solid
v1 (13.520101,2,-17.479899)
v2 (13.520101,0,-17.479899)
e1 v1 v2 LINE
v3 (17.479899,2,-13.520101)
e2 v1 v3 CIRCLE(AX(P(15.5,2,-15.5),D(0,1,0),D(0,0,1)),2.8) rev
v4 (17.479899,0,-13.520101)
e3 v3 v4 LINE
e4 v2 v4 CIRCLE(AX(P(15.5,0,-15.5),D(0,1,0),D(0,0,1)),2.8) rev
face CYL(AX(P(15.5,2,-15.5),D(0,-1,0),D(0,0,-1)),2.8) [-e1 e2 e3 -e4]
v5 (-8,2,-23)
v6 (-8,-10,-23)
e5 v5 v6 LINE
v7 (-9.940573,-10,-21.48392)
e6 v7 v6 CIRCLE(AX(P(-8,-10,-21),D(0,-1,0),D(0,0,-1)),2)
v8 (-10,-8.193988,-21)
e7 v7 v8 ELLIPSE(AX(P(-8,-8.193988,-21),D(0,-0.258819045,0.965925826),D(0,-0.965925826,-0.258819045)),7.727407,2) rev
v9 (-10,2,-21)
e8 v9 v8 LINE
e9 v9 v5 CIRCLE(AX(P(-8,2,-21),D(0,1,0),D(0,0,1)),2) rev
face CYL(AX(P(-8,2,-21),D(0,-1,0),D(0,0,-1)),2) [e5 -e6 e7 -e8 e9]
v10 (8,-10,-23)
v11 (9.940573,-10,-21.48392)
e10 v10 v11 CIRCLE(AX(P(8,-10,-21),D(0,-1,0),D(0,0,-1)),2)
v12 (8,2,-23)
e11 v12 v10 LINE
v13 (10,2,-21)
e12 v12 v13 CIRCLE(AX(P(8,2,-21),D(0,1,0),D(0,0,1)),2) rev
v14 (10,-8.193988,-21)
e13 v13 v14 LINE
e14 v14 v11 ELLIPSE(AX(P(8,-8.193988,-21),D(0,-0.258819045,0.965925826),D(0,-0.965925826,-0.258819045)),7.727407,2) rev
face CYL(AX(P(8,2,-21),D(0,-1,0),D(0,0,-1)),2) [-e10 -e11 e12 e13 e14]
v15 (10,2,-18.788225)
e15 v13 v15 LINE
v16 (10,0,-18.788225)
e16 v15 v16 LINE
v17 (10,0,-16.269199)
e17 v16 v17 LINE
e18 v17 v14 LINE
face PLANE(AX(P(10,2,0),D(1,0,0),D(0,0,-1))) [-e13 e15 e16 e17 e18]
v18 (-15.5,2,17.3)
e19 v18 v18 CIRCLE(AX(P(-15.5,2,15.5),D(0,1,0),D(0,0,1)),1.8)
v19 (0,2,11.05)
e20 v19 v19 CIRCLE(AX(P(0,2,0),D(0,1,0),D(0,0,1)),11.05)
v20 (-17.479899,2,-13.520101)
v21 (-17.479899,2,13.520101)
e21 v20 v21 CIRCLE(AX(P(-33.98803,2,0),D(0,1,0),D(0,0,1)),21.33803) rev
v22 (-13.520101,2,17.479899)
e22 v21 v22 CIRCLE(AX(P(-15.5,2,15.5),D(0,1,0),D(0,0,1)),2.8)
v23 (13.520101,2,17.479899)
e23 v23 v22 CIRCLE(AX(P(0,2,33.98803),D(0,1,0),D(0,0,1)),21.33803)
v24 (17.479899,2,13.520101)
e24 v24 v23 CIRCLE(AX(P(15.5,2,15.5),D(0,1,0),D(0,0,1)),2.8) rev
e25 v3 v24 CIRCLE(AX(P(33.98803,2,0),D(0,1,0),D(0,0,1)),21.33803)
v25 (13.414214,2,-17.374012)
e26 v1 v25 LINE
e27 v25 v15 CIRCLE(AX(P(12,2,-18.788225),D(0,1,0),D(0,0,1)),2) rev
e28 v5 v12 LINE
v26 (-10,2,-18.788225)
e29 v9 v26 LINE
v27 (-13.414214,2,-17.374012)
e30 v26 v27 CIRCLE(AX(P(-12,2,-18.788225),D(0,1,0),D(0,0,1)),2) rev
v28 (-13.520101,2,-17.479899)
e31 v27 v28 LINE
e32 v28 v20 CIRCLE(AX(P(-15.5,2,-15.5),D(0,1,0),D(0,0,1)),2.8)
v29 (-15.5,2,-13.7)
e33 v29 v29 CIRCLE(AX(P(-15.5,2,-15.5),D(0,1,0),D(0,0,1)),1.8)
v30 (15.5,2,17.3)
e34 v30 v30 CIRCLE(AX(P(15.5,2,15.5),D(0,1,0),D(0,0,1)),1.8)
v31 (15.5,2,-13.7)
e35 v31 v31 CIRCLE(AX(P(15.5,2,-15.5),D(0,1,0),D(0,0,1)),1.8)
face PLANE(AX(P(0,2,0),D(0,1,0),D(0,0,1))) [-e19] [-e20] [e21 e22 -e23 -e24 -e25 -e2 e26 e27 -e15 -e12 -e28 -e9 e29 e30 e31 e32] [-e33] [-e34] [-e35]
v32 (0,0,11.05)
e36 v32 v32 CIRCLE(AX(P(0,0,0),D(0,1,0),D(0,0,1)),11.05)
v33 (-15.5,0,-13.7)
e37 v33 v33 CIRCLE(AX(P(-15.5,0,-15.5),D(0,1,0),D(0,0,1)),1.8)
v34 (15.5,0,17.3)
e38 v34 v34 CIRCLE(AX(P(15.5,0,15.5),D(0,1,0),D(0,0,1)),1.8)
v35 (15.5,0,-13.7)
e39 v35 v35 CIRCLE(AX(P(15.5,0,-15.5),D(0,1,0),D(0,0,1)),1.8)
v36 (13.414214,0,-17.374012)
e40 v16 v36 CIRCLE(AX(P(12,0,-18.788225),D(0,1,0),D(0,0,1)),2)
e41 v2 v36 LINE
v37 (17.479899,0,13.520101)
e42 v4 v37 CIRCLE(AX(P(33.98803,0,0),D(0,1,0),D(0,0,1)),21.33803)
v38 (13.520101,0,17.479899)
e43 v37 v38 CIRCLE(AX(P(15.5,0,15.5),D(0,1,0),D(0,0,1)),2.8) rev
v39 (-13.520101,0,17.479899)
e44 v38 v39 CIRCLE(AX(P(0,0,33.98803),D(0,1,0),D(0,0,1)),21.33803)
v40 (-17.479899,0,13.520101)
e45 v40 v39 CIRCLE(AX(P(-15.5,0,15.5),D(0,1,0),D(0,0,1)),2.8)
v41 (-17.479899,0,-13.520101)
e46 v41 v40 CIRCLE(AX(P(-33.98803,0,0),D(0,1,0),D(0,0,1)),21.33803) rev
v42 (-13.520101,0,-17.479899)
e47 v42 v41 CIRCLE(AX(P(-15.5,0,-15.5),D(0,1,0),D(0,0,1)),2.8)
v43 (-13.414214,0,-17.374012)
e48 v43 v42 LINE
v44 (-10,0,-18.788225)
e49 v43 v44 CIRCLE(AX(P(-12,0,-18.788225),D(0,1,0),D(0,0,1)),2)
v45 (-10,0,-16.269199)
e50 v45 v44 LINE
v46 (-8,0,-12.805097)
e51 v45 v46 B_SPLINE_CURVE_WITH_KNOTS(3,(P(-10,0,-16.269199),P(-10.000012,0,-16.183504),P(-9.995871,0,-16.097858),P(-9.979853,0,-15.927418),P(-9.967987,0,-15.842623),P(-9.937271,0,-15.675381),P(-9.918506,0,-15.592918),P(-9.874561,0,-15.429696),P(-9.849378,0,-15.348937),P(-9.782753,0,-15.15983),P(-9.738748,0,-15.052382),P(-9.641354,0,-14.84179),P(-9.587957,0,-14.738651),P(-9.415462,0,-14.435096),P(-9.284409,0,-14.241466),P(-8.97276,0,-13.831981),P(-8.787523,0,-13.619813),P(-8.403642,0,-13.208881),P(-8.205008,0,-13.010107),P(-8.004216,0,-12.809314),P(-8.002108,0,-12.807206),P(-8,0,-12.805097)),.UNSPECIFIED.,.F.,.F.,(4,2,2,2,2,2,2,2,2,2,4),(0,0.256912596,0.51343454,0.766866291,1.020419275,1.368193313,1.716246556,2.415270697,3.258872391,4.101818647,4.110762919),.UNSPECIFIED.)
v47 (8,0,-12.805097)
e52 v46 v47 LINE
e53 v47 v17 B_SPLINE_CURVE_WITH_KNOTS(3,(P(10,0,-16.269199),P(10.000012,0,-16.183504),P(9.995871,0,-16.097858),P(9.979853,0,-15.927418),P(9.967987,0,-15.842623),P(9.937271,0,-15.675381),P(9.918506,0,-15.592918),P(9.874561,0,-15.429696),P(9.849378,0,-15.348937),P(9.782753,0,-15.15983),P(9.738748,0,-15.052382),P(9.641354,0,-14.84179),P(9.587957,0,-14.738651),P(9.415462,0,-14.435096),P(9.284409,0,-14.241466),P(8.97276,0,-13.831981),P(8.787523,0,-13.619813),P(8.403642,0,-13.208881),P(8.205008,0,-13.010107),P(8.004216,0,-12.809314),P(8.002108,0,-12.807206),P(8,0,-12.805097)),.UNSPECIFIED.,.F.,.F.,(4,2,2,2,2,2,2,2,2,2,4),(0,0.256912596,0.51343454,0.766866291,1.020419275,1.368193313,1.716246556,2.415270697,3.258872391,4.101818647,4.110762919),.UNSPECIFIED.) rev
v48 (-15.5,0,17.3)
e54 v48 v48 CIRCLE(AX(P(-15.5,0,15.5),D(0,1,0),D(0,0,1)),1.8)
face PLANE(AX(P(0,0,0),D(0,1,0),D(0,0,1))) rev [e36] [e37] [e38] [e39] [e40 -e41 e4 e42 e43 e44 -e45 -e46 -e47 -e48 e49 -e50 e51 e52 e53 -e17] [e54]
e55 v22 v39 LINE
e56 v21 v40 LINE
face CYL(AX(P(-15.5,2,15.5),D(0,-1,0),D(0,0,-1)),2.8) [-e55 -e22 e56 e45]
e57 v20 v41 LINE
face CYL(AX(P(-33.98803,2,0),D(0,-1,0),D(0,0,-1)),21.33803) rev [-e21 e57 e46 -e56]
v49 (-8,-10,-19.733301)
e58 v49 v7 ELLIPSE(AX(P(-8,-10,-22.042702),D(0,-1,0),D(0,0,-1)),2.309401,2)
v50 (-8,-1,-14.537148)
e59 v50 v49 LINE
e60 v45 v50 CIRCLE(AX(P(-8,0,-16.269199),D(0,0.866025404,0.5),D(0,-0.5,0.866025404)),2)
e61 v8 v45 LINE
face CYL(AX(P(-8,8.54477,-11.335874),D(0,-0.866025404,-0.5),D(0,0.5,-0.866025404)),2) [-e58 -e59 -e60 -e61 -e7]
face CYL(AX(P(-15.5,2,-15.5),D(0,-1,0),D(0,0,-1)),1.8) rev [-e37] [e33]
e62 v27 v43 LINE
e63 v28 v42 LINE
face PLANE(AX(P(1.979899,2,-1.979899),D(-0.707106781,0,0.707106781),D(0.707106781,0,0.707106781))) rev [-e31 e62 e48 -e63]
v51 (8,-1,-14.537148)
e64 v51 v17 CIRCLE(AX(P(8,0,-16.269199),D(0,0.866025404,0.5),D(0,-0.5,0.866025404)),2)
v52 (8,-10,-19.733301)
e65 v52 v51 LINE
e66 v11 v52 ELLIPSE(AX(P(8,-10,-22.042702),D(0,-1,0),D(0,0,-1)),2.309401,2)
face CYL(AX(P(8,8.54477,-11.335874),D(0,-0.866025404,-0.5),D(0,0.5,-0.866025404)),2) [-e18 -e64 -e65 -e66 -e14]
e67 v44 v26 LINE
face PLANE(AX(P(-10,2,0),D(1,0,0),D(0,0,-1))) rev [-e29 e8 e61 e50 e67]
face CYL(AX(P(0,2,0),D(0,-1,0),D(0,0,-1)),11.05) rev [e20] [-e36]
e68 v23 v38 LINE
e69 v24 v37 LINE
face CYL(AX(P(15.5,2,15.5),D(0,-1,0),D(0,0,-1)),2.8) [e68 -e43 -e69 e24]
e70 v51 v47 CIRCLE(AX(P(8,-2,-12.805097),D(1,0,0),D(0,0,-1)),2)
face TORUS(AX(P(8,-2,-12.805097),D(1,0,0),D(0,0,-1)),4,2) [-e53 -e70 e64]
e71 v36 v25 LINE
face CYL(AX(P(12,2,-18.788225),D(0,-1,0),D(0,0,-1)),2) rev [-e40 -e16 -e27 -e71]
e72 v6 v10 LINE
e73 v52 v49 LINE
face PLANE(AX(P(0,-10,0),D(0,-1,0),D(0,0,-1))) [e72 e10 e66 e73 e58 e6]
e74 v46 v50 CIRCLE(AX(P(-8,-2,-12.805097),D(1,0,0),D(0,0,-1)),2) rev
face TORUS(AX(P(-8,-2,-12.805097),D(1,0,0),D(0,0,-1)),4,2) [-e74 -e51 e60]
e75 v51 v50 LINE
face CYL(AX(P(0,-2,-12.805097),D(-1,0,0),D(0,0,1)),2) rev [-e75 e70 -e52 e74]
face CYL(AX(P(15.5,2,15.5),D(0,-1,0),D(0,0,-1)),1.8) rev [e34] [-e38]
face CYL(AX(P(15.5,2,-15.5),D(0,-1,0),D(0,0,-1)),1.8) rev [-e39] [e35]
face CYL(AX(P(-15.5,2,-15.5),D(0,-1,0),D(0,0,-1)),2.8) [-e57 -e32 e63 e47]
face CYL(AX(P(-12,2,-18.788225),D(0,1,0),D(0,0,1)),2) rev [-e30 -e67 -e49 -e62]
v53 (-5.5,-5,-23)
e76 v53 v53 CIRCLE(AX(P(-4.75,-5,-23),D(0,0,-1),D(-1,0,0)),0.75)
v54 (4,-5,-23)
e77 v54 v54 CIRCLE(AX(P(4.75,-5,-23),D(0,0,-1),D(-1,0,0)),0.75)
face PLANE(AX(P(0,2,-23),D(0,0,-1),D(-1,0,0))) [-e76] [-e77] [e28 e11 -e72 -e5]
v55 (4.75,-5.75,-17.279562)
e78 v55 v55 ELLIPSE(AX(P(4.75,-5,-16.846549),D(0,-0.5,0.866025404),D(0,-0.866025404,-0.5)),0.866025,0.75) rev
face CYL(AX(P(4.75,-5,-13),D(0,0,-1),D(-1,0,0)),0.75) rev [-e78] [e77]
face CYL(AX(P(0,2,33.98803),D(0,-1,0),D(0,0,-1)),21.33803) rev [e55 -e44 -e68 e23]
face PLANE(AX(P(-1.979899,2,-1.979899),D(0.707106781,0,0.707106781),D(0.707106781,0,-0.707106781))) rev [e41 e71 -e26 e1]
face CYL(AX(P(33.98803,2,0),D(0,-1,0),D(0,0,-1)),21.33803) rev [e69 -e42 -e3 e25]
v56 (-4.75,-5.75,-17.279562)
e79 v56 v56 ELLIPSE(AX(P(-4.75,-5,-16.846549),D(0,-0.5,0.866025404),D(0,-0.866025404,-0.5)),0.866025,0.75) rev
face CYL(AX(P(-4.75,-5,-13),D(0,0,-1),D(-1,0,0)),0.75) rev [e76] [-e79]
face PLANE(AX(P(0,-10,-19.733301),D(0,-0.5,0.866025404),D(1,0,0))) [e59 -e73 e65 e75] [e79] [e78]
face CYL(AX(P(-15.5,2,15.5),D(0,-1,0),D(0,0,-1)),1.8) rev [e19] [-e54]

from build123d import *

# Parameters (mm, degrees)
SKETCH_1_R          = 1.8
EXTRUDE_1_DEPTH     = 2
EXTRUDE_START       = 10
EXTRUDE_2_DEPTH     = 10
SKETCH_3_R          = 0.75
CUT_EXTRUDE_1_DEPTH = 10
FILLET_3_R          = 2
CHAMFER_1_SIZE      = 5.773502692
CHAMFER_1_SIZE_2    = 10
FILLET_1_R          = 2
FILLET_2_R          = 2


with BuildPart() as part:
    # 草图1 → 凸台-拉伸1 (new body)
    # profile 1 of 19: a face of its own
    with BuildSketch(Plane(origin=(0, 0, 0), x_dir=(1, 0, 0), z_dir=(0, 1, 0))):
        with BuildLine():
            ThreePointArc((17.479898987, 13.520101013), (17.479898987, 17.479898987), (13.520101013, 17.479898987))
            Line((13.520101013, 17.479898987), (10, 13.959797975))
            Line((10, 13.959797975), (6.743130876, 10.702928851))
            ThreePointArc((6.743130876, 10.702928851), (8.944900782, 8.944900782), (10.702928851, 6.743130876))
            Line((10.702928851, 6.743130876), (17.479898987, 13.520101013))
        make_face()
        with Locations(Location((15.5, 15.5, 0), (0, 0, 270))):
            Circle(SKETCH_1_R, mode=Mode.SUBTRACT)
    # profile 2 of 19: a face of its own
    with BuildSketch(Plane(origin=(0, 0, 0), x_dir=(1, 0, 0), z_dir=(0, 1, 0))):
        with BuildLine():
            ThreePointArc((10.702928851, 6.743130876), (8.944900782, 8.944900782), (6.743130876, 10.702928851))
            Line((6.743130876, 10.702928851), (5.578622694, 9.538420668))
            ThreePointArc((5.578622694, 9.538420668), (7.813529932, 7.813529932), (9.538420668, 5.578622694))
            Line((9.538420668, 5.578622694), (10.702928851, 6.743130876))
        make_face()
    # profile 3 of 19: a face of its own
    with BuildSketch(Plane(origin=(0, 0, 0), x_dir=(1, 0, 0), z_dir=(0, 1, 0))):
        with BuildLine():
            Line((5.578622694, 9.538420668), (6.743130876, 10.702928851))
            ThreePointArc((6.743130876, 10.702928851), (0, 12.65), (-6.743130876, 10.702928851))
            Line((-6.743130876, 10.702928851), (-5.578622694, 9.538420668))
            ThreePointArc((-5.578622694, 9.538420668), (0, 11.05), (5.578622694, 9.538420668))
        make_face()
    # profile 4 of 19: a face of its own
    with BuildSketch(Plane(origin=(0, 0, 0), x_dir=(1, 0, 0), z_dir=(0, 1, 0))):
        with BuildLine():
            ThreePointArc((12.65, 0), (12.153488182, 3.509305489), (10.702928851, 6.743130876))
            Line((10.702928851, 6.743130876), (9.538420668, 5.578622694))
            ThreePointArc((9.538420668, 5.578622694), (10.665412519, 2.889892006), (11.05, 0))
            ThreePointArc((11.05, 0), (10.665412519, -2.889892006), (9.538420668, -5.578622694))
            Line((9.538420668, -5.578622694), (10.702928851, -6.743130876))
            ThreePointArc((10.702928851, -6.743130876), (12.153488182, -3.509305489), (12.65, 0))
        make_face()
    # profile 5 of 19: a face of its own
    with BuildSketch(Plane(origin=(0, 0, 0), x_dir=(1, 0, 0), z_dir=(0, 1, 0))):
        with BuildLine():
            ThreePointArc((6.743130876, -10.702928851), (8.944900782, -8.944900782), (10.702928851, -6.743130876))
            Line((10.702928851, -6.743130876), (9.538420668, -5.578622694))
            ThreePointArc((9.538420668, -5.578622694), (7.813529932, -7.813529932), (5.578622694, -9.538420668))
            Line((5.578622694, -9.538420668), (6.743130876, -10.702928851))
        make_face()
    # profile 6 of 19: a face of its own
    with BuildSketch(Plane(origin=(0, 0, 0), x_dir=(1, 0, 0), z_dir=(0, 1, 0))):
        with BuildLine():
            ThreePointArc((0, -12.65), (3.50930549, -12.153488182), (6.743130876, -10.702928851))
            Line((6.743130876, -10.702928851), (5.578622694, -9.538420668))
            ThreePointArc((5.578622694, -9.538420668), (0, -11.05), (-5.578622694, -9.538420668))
            Line((-5.578622694, -9.538420668), (-6.743130876, -10.702928851))
            ThreePointArc((-6.743130876, -10.702928851), (-3.509305489, -12.153488182), (0, -12.65))
        make_face()
    # profile 7 of 19: a face of its own
    with BuildSketch(Plane(origin=(0, 0, 0), x_dir=(1, 0, 0), z_dir=(0, 1, 0))):
        with BuildLine():
            Line((17.479898987, -13.520101013), (10.702928851, -6.743130876))
            ThreePointArc((10.702928851, -6.743130876), (8.944900782, -8.944900782), (6.743130876, -10.702928851))
            Line((6.743130876, -10.702928851), (13.520101013, -17.479898987))
            ThreePointArc((13.520101013, -17.479898987), (17.479898987, -17.479898987), (17.479898987, -13.520101013))
        make_face()
        with Locations(Location((15.5, -15.5, 0), (0, 0, 270))):
            Circle(SKETCH_1_R, mode=Mode.SUBTRACT)
    # profile 8 of 19: a face of its own
    with BuildSketch(Plane(origin=(0, 0, 0), x_dir=(1, 0, 0), z_dir=(0, 1, 0))):
        with BuildLine():
            ThreePointArc((-6.743130876, -10.702928851), (-8.944900782, -8.944900782), (-10.702928851, -6.743130876))
            Line((-10.702928851, -6.743130876), (-17.479898987, -13.520101013))
            ThreePointArc((-17.479898987, -13.520101013), (-17.479898987, -17.479898987), (-13.520101013, -17.479898987))
            Line((-13.520101013, -17.479898987), (-6.743130876, -10.702928851))
        make_face()
        with Locations(Location((-15.5, -15.5, 0), (0, 0, 270))):
            Circle(SKETCH_1_R, mode=Mode.SUBTRACT)
    # profile 9 of 19: a face of its own
    with BuildSketch(Plane(origin=(0, 0, 0), x_dir=(1, 0, 0), z_dir=(0, 1, 0))):
        with BuildLine():
            Line((13.520101013, -17.479898987), (6.743130876, -10.702928851))
            ThreePointArc((6.743130876, -10.702928851), (3.50930549, -12.153488182), (0, -12.65))
            ThreePointArc((0, -12.65), (7.178458324, -13.893720868), (13.520101013, -17.479898987))
        make_face()
    # profile 10 of 19: a face of its own
    with BuildSketch(Plane(origin=(0, 0, 0), x_dir=(1, 0, 0), z_dir=(0, 1, 0))):
        with BuildLine():
            ThreePointArc((-13.520101013, -17.479898987), (-7.178458324, -13.893720867), (0, -12.65))
            ThreePointArc((0, -12.65), (-3.509305489, -12.153488182), (-6.743130876, -10.702928851))
            Line((-6.743130876, -10.702928851), (-13.520101013, -17.479898987))
        make_face()
    # profile 11 of 19: a face of its own
    with BuildSketch(Plane(origin=(0, 0, 0), x_dir=(1, 0, 0), z_dir=(0, 1, 0))):
        with BuildLine():
            ThreePointArc((17.479898987, -13.520101013), (13.893720868, -7.178458324), (12.65, 0))
            ThreePointArc((12.65, 0), (12.153488182, -3.509305489), (10.702928851, -6.743130876))
            Line((10.702928851, -6.743130876), (17.479898987, -13.520101013))
        make_face()
    # profile 12 of 19: a face of its own
    with BuildSketch(Plane(origin=(0, 0, 0), x_dir=(1, 0, 0), z_dir=(0, 1, 0))):
        with BuildLine():
            ThreePointArc((12.65, 0), (13.893720868, 7.178458324), (17.479898987, 13.520101013))
            Line((17.479898987, 13.520101013), (10.702928851, 6.743130876))
            ThreePointArc((10.702928851, 6.743130876), (12.153488182, 3.509305489), (12.65, 0))
        make_face()
    # profile 13 of 19: a face of its own
    with BuildSketch(Plane(origin=(0, 0, 0), x_dir=(1, 0, 0), z_dir=(0, 1, 0))):
        with BuildLine():
            ThreePointArc((-12.65, 2.4e-08), (-12.153488178, 3.509305501), (-10.702928851, 6.743130876))
            Line((-10.702928851, 6.743130876), (-17.479898987, 13.520101013))
            ThreePointArc((-17.479898987, 13.520101013), (-13.893720872, 7.178458335), (-12.65, 2.4e-08))
        make_face()
    # profile 14 of 19: a face of its own
    with BuildSketch(Plane(origin=(0, 0, 0), x_dir=(1, 0, 0), z_dir=(0, 1, 0))):
        with BuildLine():
            ThreePointArc((-10.702928851, -6.743130876), (-12.153488185, -3.509305478), (-12.65, 2.4e-08))
            ThreePointArc((-12.65, 2.4e-08), (-13.893720864, -7.178458313), (-17.479898987, -13.520101013))
            Line((-17.479898987, -13.520101013), (-10.702928851, -6.743130876))
        make_face()
    # profile 15 of 19: a face of its own
    with BuildSketch(Plane(origin=(0, 0, 0), x_dir=(1, 0, 0), z_dir=(0, 1, 0))):
        with BuildLine():
            ThreePointArc((-10.702928851, 6.743130876), (-8.944900782, 8.944900782), (-6.743130876, 10.702928851))
            Line((-6.743130876, 10.702928851), (-10, 13.959797975))
            Line((-10, 13.959797975), (-13.520101013, 17.479898987))
            ThreePointArc((-13.520101013, 17.479898987), (-17.479898987, 17.479898987), (-17.479898987, 13.520101013))
            Line((-17.479898987, 13.520101013), (-10.702928851, 6.743130876))
        make_face()
        with Locations(Location((-15.5, 15.5, 0), (0, 0, 270))):
            Circle(SKETCH_1_R, mode=Mode.SUBTRACT)
    # profile 16 of 19: a face of its own
    with BuildSketch(Plane(origin=(0, 0, 0), x_dir=(1, 0, 0), z_dir=(0, 1, 0))):
        with BuildLine():
            Line((-5.578622694, 9.538420668), (-6.743130876, 10.702928851))
            ThreePointArc((-6.743130876, 10.702928851), (-8.944900782, 8.944900782), (-10.702928851, 6.743130876))
            Line((-10.702928851, 6.743130876), (-9.538420668, 5.578622694))
            ThreePointArc((-9.538420668, 5.578622694), (-7.813529932, 7.813529932), (-5.578622694, 9.538420668))
        make_face()
    # profile 17 of 19: a face of its own
    with BuildSketch(Plane(origin=(0, 0, 0), x_dir=(1, 0, 0), z_dir=(0, 1, 0))):
        with BuildLine():
            Line((-9.538420668, 5.578622694), (-10.702928851, 6.743130876))
            ThreePointArc((-10.702928851, 6.743130876), (-12.153488178, 3.509305501), (-12.65, 2.4e-08))
            ThreePointArc((-12.65, 2.4e-08), (-12.153488185, -3.509305478), (-10.702928851, -6.743130876))
            Line((-10.702928851, -6.743130876), (-9.538420668, -5.578622694))
            ThreePointArc((-9.538420668, -5.578622694), (-11.05, 0), (-9.538420668, 5.578622694))
        make_face()
    # profile 18 of 19: a face of its own
    with BuildSketch(Plane(origin=(0, 0, 0), x_dir=(1, 0, 0), z_dir=(0, 1, 0))):
        with BuildLine():
            ThreePointArc((-5.578622694, -9.538420668), (-7.813529932, -7.813529932), (-9.538420668, -5.578622694))
            Line((-9.538420668, -5.578622694), (-10.702928851, -6.743130876))
            ThreePointArc((-10.702928851, -6.743130876), (-8.944900782, -8.944900782), (-6.743130876, -10.702928851))
            Line((-6.743130876, -10.702928851), (-5.578622694, -9.538420668))
        make_face()
    # profile 19 of 19: a face of its own
    with BuildSketch(Plane(origin=(0, 0, 0), x_dir=(1, 0, 0), z_dir=(0, 1, 0))):
        with BuildLine():
            Line((6.743130876, 10.702928851), (10, 13.959797975))
            Line((10, 13.959797975), (10, 21))
            ThreePointArc((10, 21), (9.414213562, 22.414213562), (8, 23))
            Line((8, 23), (-8, 23))
            ThreePointArc((-8, 23), (-9.414213562, 22.414213562), (-10, 21))
            Line((-10, 21), (-10, 13.959797975))
            Line((-10, 13.959797975), (-6.743130876, 10.702928851))
            ThreePointArc((-6.743130876, 10.702928851), (0, 12.65), (6.743130876, 10.702928851))
        make_face()
    extrude(amount=EXTRUDE_1_DEPTH)

    # 草图2 → 凸台-拉伸2 (add)
    with BuildSketch(Plane.XZ.offset(EXTRUDE_START)):
        with BuildLine():
            Line((10, -13.959797975), (-10, -13.959797975))
            Line((-10, -13.959797975), (-10, -21))
            ThreePointArc((-10, -21), (-9.414213562, -22.414213562), (-8, -23))
            Line((-8, -23), (8, -23))
            ThreePointArc((8, -23), (9.414213562, -22.414213562), (10, -21))
            Line((10, -21), (10, -13.959797975))
        make_face()
    extrude(amount=-EXTRUDE_2_DEPTH)

    # 草图3 → 切除-拉伸1 (cut)
    with BuildSketch(Plane(origin=(0, 0, -23), x_dir=(-1, 0, 0), z_dir=(0, 0, -1))):
        with Locations((4.75, -5)):
            Circle(SKETCH_3_R)
        with Locations((-4.75, -5)):
            Circle(SKETCH_3_R)
    extrude(amount=-CUT_EXTRUDE_1_DEPTH, mode=Mode.SUBTRACT)

    # 圆角3
    fillet_3_edges = [part.edges().sort_by_distance(p)[0] for p in [
        (-10, 1, -13.959797975),
        (10, 1, -13.959797975),
    ]]
    fillet(fillet_3_edges, radius=FILLET_3_R)

    # 倒角1
    # the kernel refuses this chamfer: 10, 5.773502692 mm, written as the material it takes off along each edge
    with BuildSketch(Plane(origin=(35.870857546, -10, -13.959797975), x_dir=(0, 0, -1), z_dir=(-1, 0, 0))) as chamfer_1_piece_1_section:
        Polygon((CHAMFER_1_SIZE, 0), (0, -CHAMFER_1_SIZE_2), (0, 0), align=None)
    chamfer_1_piece_1 = extrude(amount=71.741715093, mode=Mode.PRIVATE)
    chamfer_1_piece_1 = split(chamfer_1_piece_1, bisect_by=Plane(origin=(35.870857546, 0, -13.959797975), z_dir=(0, -1, 0)), keep=Keep.TOP, mode=Mode.PRIVATE)
    add(chamfer_1_piece_1, mode=Mode.SUBTRACT)

    # 圆角1
    fillet_1_edges = [part.edges().sort_by_distance(p)[0] for p in [
        (0, 0, -13.959797975),
    ]]
    fillet(fillet_1_edges, radius=FILLET_1_R)

    # 圆角2
    # the kernel refuses this fillet: 2 mm, written as the material it takes off along each edge
    with BuildSketch(Plane(origin=(-10, -2, -12.805097436), x_dir=(0, -0.8014106175284074, 0.5981145560114189), z_dir=(0, -0.5981145560114189, -0.8014106175284074))) as fillet_2_piece_1_section:
        with BuildLine():
            CenterArc((2 + FILLET_2_R, -FILLET_2_R), FILLET_2_R, 90, 90)
            Line((2, -FILLET_2_R), (2, 0))
            Line((2, 0), (2 + FILLET_2_R, 0))
        make_face()
    fillet_2_piece_1 = revolve(axis=Axis((-10, -2, -12.805097436), (-1, 0, 0)), revolution_arc=203.265018323, mode=Mode.PRIVATE)
    fillet_2_piece_1 = split(fillet_2_piece_1, bisect_by=Plane(origin=(-10, 0, -12.805097436), z_dir=(0, -1, 0)), keep=Keep.TOP, mode=Mode.PRIVATE)
    add(fillet_2_piece_1, mode=Mode.SUBTRACT)
    with BuildSketch(Plane(origin=(10, -2, -12.805097436), x_dir=(0, -0.8014106175284074, 0.5981145560114189), z_dir=(0, -0.5981145560114189, -0.8014106175284074))) as fillet_2_piece_2_section:
        with BuildLine():
            CenterArc((2 + FILLET_2_R, FILLET_2_R), FILLET_2_R, 180, 90)
            Line((2 + FILLET_2_R, 0), (2, 0))
            Line((2, 0), (2, FILLET_2_R))
        make_face()
    fillet_2_piece_2 = revolve(axis=Axis((10, -2, -12.805097436), (-1, 0, 0)), revolution_arc=203.265018323, mode=Mode.PRIVATE)
    fillet_2_piece_2 = split(fillet_2_piece_2, bisect_by=Plane(origin=(10, 0, -12.805097436), z_dir=(0, -1, 0)), keep=Keep.TOP, mode=Mode.PRIVATE)
    add(fillet_2_piece_2, mode=Mode.SUBTRACT)
    with BuildSketch(Plane(origin=(-10, -14.330127019, -22.233300667), x_dir=(1, 0, 0), z_dir=(0, 0.8660254037805484, 0.5000000000067383)), Plane(origin=(10, -1, -14.537148244), x_dir=(-1, 0, 0), z_dir=(0, -0.8660254037805484, -0.5000000000067383))) as fillet_2_piece_3:
        with BuildLine():
            CenterArc((FILLET_2_R, FILLET_2_R), FILLET_2_R, 180, 90)
            Line((0, FILLET_2_R), (0, 0))
            Line((0, 0), (FILLET_2_R, 0))
        make_face()
    extrude(amount=15.392304845, mode=Mode.SUBTRACT)


solid = part.part
